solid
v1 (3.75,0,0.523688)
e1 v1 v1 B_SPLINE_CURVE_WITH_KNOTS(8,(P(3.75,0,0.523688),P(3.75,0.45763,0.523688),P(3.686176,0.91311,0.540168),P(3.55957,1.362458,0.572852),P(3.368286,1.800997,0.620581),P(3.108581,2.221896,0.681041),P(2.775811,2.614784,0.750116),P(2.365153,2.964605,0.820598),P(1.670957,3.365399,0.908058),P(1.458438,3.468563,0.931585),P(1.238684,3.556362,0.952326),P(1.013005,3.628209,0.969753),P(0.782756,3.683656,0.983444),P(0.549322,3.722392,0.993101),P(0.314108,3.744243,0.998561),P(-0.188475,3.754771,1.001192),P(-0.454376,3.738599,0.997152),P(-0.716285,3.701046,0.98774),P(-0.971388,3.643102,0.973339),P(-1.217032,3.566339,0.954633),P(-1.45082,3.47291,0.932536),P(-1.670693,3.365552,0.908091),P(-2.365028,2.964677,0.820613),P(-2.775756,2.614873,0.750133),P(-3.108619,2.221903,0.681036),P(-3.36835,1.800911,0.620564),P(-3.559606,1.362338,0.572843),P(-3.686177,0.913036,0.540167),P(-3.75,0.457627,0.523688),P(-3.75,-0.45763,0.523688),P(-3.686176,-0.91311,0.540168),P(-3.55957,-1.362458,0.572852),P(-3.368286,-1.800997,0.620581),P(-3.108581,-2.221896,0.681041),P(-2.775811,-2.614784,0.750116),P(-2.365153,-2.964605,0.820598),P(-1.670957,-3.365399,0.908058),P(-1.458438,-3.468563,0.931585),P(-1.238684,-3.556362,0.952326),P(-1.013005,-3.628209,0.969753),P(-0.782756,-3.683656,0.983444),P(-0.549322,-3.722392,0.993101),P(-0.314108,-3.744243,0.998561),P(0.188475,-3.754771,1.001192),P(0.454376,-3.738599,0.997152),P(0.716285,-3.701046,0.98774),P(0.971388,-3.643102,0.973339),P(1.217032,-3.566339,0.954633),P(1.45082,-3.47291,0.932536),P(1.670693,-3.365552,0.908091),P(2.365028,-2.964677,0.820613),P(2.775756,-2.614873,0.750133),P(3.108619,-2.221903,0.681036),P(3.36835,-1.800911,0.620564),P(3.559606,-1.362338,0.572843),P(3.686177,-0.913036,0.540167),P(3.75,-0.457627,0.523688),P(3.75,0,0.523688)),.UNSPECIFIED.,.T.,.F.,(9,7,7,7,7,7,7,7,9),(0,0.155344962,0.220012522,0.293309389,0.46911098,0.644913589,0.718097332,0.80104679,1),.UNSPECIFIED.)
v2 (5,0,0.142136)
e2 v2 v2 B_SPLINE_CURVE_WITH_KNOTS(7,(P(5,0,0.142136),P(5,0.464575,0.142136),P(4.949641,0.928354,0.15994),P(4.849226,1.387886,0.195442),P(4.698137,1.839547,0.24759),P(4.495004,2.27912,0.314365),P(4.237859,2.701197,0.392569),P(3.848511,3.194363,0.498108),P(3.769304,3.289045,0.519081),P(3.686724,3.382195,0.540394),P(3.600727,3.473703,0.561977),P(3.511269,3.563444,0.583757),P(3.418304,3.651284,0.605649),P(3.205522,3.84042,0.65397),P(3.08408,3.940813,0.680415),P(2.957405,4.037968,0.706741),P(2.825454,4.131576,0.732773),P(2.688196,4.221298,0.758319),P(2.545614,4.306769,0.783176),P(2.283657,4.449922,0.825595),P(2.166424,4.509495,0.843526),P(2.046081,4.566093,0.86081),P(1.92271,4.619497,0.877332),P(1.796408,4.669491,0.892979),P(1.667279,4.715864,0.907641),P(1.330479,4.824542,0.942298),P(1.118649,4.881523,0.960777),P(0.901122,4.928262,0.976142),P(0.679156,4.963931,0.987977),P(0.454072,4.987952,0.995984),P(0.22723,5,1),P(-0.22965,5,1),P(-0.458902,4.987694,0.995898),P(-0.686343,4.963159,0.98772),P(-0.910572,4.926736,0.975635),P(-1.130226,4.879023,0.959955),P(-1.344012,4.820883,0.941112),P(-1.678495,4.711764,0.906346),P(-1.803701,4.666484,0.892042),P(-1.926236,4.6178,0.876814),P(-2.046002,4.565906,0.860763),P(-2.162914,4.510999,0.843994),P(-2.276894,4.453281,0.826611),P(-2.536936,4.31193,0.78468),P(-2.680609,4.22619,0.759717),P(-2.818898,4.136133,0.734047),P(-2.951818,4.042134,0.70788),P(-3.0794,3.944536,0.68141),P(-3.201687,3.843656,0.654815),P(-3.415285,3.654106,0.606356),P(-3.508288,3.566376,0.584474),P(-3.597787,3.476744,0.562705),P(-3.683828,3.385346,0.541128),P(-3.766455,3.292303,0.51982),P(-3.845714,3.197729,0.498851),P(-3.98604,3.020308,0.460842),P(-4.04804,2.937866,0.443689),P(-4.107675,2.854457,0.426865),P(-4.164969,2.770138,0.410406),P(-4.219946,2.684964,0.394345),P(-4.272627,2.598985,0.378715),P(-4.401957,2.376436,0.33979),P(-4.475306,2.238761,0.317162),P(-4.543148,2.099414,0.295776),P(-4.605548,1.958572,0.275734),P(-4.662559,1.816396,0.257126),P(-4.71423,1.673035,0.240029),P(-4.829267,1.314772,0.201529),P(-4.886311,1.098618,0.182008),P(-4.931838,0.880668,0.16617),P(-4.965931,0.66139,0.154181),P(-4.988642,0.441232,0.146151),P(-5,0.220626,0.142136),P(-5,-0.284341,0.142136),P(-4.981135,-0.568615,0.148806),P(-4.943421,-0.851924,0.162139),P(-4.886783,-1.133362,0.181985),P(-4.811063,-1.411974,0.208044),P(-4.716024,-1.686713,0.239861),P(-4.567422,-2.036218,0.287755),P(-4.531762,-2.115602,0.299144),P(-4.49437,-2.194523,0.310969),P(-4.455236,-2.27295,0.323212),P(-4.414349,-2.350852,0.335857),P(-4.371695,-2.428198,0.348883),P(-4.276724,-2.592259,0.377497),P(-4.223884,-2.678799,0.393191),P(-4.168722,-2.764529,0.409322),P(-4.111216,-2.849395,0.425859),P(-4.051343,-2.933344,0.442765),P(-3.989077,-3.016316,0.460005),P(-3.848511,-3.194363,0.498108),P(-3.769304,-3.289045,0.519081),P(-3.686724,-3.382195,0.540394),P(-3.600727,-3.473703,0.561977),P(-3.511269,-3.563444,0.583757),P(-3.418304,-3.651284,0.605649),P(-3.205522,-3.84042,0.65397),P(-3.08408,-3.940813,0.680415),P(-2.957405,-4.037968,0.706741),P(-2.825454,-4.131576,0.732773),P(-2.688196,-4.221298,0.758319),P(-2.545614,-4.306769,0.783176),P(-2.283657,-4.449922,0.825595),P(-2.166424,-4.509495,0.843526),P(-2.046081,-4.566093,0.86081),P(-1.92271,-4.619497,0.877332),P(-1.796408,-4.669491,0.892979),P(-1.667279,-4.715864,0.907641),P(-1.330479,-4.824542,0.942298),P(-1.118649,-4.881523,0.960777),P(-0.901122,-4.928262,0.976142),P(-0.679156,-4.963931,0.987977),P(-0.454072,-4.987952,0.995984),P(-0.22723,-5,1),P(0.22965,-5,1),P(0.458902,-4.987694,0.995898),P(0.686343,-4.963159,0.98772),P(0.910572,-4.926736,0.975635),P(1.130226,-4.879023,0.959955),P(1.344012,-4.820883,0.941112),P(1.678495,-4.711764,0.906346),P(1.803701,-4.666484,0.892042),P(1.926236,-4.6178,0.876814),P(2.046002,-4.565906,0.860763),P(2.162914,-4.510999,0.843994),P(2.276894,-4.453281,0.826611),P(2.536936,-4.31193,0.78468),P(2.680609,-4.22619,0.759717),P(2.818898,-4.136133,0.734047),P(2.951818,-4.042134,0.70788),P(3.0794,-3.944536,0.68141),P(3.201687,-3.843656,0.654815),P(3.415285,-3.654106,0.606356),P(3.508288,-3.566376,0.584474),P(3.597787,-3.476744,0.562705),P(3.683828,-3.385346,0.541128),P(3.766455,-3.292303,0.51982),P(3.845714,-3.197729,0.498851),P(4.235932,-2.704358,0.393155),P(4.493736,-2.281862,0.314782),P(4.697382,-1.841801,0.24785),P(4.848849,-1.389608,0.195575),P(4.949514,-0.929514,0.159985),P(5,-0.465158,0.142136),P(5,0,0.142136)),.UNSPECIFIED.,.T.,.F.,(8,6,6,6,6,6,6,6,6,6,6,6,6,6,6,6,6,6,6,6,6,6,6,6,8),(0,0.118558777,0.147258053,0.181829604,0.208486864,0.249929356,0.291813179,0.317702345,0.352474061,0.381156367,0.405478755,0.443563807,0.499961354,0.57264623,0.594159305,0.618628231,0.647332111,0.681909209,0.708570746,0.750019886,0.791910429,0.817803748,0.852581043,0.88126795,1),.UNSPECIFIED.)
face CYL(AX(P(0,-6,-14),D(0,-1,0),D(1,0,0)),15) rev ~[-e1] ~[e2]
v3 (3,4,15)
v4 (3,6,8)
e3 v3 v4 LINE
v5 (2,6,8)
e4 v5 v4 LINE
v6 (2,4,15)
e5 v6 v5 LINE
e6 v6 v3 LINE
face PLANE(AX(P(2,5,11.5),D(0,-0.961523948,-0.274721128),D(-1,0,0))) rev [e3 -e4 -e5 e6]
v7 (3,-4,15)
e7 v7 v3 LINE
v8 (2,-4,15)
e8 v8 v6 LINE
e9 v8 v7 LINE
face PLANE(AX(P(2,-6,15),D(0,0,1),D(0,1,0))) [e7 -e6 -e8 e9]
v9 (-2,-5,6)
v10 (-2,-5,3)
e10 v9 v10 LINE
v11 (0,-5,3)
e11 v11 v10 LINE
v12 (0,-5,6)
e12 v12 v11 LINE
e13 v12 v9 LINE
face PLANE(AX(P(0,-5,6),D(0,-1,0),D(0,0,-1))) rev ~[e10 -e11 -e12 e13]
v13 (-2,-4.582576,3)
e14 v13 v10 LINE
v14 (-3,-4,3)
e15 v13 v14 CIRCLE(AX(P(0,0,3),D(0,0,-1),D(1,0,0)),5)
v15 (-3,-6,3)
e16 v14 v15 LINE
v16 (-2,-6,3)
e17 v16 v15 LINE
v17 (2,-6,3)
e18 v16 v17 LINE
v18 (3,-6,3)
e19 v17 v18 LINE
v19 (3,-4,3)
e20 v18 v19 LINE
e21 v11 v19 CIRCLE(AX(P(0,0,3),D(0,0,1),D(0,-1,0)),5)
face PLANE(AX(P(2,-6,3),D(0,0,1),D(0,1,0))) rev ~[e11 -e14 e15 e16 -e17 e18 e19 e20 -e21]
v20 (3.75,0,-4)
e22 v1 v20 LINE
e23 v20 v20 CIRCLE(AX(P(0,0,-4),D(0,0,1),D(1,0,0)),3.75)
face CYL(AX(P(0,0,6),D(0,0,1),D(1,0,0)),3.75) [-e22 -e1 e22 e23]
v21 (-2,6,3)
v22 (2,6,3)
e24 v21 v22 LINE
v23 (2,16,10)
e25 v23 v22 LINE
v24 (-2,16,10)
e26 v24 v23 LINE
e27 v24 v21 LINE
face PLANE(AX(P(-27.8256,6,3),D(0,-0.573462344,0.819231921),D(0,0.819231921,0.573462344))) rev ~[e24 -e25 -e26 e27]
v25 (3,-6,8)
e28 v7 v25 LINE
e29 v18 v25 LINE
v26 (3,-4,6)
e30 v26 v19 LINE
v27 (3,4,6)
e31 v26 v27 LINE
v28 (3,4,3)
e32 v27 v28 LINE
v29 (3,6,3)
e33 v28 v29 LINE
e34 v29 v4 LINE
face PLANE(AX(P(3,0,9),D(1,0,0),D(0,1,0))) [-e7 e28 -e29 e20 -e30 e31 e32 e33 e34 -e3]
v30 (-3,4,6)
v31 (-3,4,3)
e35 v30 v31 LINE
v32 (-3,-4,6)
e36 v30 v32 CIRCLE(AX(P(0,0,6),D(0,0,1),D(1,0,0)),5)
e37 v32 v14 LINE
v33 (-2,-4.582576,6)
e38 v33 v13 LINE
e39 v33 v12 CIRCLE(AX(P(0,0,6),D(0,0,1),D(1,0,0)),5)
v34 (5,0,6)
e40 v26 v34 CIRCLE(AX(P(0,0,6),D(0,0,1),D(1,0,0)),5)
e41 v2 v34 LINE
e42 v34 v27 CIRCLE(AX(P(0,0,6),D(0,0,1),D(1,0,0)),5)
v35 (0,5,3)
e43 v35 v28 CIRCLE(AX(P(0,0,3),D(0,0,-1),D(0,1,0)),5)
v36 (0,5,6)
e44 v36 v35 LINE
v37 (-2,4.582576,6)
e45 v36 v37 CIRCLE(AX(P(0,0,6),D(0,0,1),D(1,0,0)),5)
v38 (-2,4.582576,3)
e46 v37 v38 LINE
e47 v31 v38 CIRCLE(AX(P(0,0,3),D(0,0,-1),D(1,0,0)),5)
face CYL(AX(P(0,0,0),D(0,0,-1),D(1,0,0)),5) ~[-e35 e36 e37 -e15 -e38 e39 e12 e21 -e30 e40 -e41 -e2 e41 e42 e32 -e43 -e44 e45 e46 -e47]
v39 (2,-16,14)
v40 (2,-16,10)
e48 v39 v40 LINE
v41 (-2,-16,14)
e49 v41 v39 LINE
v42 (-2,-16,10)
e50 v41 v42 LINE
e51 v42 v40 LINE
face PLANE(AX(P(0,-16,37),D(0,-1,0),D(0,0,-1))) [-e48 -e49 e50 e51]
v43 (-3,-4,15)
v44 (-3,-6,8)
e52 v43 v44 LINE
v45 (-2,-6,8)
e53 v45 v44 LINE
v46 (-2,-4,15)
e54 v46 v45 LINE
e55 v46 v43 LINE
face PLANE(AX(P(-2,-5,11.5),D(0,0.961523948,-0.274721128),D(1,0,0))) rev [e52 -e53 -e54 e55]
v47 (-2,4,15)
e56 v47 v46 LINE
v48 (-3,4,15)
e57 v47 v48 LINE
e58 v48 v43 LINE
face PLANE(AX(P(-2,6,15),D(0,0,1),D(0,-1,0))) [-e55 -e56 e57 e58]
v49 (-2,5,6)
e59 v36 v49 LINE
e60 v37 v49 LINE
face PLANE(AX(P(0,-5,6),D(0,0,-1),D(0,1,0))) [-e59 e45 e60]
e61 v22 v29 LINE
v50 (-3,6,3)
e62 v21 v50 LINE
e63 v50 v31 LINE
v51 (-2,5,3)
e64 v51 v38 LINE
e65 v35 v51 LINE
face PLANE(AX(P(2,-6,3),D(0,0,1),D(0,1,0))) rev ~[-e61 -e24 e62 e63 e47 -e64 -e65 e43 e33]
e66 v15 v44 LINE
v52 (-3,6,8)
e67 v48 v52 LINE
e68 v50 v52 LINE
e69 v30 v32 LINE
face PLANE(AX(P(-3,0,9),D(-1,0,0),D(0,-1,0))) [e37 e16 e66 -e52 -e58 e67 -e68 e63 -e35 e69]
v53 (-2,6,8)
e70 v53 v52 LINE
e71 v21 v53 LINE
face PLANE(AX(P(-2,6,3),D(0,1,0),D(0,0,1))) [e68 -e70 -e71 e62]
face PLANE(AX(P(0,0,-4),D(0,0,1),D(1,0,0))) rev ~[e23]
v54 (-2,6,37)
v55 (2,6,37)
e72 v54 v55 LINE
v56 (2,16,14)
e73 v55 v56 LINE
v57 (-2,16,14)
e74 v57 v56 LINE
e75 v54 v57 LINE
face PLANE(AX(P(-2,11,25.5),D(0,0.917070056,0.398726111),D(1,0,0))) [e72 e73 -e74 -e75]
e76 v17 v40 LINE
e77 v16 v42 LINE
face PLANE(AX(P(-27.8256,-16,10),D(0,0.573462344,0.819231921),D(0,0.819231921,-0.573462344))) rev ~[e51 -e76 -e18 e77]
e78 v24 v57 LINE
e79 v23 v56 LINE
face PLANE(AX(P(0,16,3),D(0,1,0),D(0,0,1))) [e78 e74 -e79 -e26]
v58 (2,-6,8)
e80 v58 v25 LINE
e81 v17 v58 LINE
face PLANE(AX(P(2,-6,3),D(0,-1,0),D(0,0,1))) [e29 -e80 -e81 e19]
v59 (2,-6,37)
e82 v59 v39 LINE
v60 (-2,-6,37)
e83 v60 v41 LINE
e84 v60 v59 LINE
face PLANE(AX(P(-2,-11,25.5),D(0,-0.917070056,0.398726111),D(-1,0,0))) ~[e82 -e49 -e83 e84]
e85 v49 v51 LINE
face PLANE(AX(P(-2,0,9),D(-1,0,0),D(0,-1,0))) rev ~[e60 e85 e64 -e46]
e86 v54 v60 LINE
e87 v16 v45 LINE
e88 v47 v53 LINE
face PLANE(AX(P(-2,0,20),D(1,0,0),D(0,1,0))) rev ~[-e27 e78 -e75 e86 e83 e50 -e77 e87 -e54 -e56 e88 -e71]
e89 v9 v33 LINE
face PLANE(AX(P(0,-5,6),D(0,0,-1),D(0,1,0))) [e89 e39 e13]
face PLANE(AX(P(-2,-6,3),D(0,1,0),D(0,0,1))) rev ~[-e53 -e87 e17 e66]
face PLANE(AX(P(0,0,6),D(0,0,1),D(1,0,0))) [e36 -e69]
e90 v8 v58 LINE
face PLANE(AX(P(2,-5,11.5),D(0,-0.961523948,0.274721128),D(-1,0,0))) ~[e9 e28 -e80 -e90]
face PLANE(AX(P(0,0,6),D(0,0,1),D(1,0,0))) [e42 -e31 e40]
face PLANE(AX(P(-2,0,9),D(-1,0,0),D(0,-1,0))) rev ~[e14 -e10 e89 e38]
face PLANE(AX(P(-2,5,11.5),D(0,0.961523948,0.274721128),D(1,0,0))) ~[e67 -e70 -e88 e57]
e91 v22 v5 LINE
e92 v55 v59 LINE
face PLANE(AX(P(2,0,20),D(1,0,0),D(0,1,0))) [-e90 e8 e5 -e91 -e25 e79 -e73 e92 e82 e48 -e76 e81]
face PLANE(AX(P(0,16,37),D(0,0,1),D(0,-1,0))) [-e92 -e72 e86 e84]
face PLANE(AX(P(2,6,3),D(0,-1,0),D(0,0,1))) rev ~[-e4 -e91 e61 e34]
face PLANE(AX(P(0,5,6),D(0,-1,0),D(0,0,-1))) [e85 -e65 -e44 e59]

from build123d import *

# Parameters (mm, degrees)
F0_R         = 5
F1_DEPTH     = 6
F3_R         = 15
F4_DEPTH     = 25
F5_R         = 3.75
F6_DEPTH     = 10
F8_DEPTH     = 2
F9_DEPTH     = 2
F10_T1_DEPTH = 55.6511992514
F11_T1_DEPTH = 55.6511992514
F12_SIZE2    = 23
F12_SIZE     = 10
F14_W        = 12
F14_H        = 12
F15_DEPTH    = 1
F16_W        = 12
F16_H        = 12
F17_DEPTH    = 1
F18_SIZE2    = 7
F18_SIZE     = 2
F19_SIZE2    = 7
F19_SIZE     = 2


# Not quite as in the source:
# - a fillet or chamfer that OpenCascade refuses, or shapes differently, is made with other operations: its cross-section is extruded or revolved along the edge and cut away or added
# - two fillets or chamfers of one size are made in one step


with BuildPart() as f1:
    # F0 (on Top) → F1 (new body)
    with BuildSketch(Plane.XY):
        Circle(F0_R)
    extrude(amount=F1_DEPTH)

    # F3 (on offset) → F4 (cut)
    with BuildSketch(Plane.XZ.offset(6)):
        with Locations((0, -14)):
            Circle(F3_R)
    extrude(amount=-F4_DEPTH, mode=Mode.SUBTRACT)

    # F5 (on face) → F6 (join)
    with BuildSketch(Plane.XY.offset(6)):
        Circle(F5_R)
    extrude(amount=-F6_DEPTH)

    # F7 (on Right) → F8 (join)
    with BuildSketch(Plane.YZ):
        Polygon((16, 3), (16, 37), (-16, 37), (-16, 3), (0, 3), align=None)
    extrude(amount=F8_DEPTH)

    # F9 (add): a face of the model
    f9_faces = [f1.faces().sort_by_distance(p)[0] for p in [
        (0, 0, 20.4395085066),
    ]]
    extrude(f9_faces, amount=F9_DEPTH)

    # F10: chamfer of 10 x 7 on 1 edges, made by hand

    # F10_s2 → F10_t1 (cut)
    with BuildSketch(Plane.YZ.offset(-27.8255996257)):
        Polygon((-16, 10), (-6, 3), (-16, 3), align=None)
    extrude(amount=F10_T1_DEPTH, mode=Mode.SUBTRACT)

    # F11: chamfer of 7 x 10 on 1 edges, made by hand

    # F11_s2 → F11_t1 (cut)
    with BuildSketch(Plane.YZ.offset(-27.8255996257)):
        Polygon((6, 3), (16, 10), (16, 3), align=None)
    extrude(amount=F11_T1_DEPTH, mode=Mode.SUBTRACT)

    # F12
    f12_edges = [f1.edges().sort_by_distance(p)[0] for p in [
        (0, -16, 37),
        (0, 16, 37),
    ]]
    f12_side = f1.faces().sort_by_distance((0, 0, 37))[0]
    chamfer(f12_edges, length=F12_SIZE, length2=F12_SIZE2, reference=f12_side)

    # F14 (on face) → F15 (join)
    with BuildSketch(Plane(origin=(-2, 0, 0), x_dir=(0, -1, 0), z_dir=(-1, 0, 0))):
        with Locations((0, 9)):
            Rectangle(F14_W, F14_H)
    extrude(amount=F15_DEPTH)

    # F16 (on face) → F17 (join)
    with BuildSketch(Plane.YZ.offset(2)):
        with Locations((0, 9)):
            Rectangle(F16_W, F16_H)
    extrude(amount=F17_DEPTH)

    # F18
    f18_edges = [f1.edges().sort_by_distance(p)[0] for p in [
        (-2.5, -6, 15),
        (-2.5, 6, 15),
    ]]
    f18_side = f1.faces().sort_by_distance((-2.5, 0, 15))[0]
    chamfer(f18_edges, length=F18_SIZE, length2=F18_SIZE2, reference=f18_side)

    # F19
    f19_edges = [f1.edges().sort_by_distance(p)[0] for p in [
        (2.5, 6, 15),
        (2.5, -6, 15),
    ]]
    f19_side = f1.faces().sort_by_distance((2.5, 0, 15))[0]
    chamfer(f19_edges, length=F19_SIZE, length2=F19_SIZE2, reference=f19_side)


solid = f1.part
